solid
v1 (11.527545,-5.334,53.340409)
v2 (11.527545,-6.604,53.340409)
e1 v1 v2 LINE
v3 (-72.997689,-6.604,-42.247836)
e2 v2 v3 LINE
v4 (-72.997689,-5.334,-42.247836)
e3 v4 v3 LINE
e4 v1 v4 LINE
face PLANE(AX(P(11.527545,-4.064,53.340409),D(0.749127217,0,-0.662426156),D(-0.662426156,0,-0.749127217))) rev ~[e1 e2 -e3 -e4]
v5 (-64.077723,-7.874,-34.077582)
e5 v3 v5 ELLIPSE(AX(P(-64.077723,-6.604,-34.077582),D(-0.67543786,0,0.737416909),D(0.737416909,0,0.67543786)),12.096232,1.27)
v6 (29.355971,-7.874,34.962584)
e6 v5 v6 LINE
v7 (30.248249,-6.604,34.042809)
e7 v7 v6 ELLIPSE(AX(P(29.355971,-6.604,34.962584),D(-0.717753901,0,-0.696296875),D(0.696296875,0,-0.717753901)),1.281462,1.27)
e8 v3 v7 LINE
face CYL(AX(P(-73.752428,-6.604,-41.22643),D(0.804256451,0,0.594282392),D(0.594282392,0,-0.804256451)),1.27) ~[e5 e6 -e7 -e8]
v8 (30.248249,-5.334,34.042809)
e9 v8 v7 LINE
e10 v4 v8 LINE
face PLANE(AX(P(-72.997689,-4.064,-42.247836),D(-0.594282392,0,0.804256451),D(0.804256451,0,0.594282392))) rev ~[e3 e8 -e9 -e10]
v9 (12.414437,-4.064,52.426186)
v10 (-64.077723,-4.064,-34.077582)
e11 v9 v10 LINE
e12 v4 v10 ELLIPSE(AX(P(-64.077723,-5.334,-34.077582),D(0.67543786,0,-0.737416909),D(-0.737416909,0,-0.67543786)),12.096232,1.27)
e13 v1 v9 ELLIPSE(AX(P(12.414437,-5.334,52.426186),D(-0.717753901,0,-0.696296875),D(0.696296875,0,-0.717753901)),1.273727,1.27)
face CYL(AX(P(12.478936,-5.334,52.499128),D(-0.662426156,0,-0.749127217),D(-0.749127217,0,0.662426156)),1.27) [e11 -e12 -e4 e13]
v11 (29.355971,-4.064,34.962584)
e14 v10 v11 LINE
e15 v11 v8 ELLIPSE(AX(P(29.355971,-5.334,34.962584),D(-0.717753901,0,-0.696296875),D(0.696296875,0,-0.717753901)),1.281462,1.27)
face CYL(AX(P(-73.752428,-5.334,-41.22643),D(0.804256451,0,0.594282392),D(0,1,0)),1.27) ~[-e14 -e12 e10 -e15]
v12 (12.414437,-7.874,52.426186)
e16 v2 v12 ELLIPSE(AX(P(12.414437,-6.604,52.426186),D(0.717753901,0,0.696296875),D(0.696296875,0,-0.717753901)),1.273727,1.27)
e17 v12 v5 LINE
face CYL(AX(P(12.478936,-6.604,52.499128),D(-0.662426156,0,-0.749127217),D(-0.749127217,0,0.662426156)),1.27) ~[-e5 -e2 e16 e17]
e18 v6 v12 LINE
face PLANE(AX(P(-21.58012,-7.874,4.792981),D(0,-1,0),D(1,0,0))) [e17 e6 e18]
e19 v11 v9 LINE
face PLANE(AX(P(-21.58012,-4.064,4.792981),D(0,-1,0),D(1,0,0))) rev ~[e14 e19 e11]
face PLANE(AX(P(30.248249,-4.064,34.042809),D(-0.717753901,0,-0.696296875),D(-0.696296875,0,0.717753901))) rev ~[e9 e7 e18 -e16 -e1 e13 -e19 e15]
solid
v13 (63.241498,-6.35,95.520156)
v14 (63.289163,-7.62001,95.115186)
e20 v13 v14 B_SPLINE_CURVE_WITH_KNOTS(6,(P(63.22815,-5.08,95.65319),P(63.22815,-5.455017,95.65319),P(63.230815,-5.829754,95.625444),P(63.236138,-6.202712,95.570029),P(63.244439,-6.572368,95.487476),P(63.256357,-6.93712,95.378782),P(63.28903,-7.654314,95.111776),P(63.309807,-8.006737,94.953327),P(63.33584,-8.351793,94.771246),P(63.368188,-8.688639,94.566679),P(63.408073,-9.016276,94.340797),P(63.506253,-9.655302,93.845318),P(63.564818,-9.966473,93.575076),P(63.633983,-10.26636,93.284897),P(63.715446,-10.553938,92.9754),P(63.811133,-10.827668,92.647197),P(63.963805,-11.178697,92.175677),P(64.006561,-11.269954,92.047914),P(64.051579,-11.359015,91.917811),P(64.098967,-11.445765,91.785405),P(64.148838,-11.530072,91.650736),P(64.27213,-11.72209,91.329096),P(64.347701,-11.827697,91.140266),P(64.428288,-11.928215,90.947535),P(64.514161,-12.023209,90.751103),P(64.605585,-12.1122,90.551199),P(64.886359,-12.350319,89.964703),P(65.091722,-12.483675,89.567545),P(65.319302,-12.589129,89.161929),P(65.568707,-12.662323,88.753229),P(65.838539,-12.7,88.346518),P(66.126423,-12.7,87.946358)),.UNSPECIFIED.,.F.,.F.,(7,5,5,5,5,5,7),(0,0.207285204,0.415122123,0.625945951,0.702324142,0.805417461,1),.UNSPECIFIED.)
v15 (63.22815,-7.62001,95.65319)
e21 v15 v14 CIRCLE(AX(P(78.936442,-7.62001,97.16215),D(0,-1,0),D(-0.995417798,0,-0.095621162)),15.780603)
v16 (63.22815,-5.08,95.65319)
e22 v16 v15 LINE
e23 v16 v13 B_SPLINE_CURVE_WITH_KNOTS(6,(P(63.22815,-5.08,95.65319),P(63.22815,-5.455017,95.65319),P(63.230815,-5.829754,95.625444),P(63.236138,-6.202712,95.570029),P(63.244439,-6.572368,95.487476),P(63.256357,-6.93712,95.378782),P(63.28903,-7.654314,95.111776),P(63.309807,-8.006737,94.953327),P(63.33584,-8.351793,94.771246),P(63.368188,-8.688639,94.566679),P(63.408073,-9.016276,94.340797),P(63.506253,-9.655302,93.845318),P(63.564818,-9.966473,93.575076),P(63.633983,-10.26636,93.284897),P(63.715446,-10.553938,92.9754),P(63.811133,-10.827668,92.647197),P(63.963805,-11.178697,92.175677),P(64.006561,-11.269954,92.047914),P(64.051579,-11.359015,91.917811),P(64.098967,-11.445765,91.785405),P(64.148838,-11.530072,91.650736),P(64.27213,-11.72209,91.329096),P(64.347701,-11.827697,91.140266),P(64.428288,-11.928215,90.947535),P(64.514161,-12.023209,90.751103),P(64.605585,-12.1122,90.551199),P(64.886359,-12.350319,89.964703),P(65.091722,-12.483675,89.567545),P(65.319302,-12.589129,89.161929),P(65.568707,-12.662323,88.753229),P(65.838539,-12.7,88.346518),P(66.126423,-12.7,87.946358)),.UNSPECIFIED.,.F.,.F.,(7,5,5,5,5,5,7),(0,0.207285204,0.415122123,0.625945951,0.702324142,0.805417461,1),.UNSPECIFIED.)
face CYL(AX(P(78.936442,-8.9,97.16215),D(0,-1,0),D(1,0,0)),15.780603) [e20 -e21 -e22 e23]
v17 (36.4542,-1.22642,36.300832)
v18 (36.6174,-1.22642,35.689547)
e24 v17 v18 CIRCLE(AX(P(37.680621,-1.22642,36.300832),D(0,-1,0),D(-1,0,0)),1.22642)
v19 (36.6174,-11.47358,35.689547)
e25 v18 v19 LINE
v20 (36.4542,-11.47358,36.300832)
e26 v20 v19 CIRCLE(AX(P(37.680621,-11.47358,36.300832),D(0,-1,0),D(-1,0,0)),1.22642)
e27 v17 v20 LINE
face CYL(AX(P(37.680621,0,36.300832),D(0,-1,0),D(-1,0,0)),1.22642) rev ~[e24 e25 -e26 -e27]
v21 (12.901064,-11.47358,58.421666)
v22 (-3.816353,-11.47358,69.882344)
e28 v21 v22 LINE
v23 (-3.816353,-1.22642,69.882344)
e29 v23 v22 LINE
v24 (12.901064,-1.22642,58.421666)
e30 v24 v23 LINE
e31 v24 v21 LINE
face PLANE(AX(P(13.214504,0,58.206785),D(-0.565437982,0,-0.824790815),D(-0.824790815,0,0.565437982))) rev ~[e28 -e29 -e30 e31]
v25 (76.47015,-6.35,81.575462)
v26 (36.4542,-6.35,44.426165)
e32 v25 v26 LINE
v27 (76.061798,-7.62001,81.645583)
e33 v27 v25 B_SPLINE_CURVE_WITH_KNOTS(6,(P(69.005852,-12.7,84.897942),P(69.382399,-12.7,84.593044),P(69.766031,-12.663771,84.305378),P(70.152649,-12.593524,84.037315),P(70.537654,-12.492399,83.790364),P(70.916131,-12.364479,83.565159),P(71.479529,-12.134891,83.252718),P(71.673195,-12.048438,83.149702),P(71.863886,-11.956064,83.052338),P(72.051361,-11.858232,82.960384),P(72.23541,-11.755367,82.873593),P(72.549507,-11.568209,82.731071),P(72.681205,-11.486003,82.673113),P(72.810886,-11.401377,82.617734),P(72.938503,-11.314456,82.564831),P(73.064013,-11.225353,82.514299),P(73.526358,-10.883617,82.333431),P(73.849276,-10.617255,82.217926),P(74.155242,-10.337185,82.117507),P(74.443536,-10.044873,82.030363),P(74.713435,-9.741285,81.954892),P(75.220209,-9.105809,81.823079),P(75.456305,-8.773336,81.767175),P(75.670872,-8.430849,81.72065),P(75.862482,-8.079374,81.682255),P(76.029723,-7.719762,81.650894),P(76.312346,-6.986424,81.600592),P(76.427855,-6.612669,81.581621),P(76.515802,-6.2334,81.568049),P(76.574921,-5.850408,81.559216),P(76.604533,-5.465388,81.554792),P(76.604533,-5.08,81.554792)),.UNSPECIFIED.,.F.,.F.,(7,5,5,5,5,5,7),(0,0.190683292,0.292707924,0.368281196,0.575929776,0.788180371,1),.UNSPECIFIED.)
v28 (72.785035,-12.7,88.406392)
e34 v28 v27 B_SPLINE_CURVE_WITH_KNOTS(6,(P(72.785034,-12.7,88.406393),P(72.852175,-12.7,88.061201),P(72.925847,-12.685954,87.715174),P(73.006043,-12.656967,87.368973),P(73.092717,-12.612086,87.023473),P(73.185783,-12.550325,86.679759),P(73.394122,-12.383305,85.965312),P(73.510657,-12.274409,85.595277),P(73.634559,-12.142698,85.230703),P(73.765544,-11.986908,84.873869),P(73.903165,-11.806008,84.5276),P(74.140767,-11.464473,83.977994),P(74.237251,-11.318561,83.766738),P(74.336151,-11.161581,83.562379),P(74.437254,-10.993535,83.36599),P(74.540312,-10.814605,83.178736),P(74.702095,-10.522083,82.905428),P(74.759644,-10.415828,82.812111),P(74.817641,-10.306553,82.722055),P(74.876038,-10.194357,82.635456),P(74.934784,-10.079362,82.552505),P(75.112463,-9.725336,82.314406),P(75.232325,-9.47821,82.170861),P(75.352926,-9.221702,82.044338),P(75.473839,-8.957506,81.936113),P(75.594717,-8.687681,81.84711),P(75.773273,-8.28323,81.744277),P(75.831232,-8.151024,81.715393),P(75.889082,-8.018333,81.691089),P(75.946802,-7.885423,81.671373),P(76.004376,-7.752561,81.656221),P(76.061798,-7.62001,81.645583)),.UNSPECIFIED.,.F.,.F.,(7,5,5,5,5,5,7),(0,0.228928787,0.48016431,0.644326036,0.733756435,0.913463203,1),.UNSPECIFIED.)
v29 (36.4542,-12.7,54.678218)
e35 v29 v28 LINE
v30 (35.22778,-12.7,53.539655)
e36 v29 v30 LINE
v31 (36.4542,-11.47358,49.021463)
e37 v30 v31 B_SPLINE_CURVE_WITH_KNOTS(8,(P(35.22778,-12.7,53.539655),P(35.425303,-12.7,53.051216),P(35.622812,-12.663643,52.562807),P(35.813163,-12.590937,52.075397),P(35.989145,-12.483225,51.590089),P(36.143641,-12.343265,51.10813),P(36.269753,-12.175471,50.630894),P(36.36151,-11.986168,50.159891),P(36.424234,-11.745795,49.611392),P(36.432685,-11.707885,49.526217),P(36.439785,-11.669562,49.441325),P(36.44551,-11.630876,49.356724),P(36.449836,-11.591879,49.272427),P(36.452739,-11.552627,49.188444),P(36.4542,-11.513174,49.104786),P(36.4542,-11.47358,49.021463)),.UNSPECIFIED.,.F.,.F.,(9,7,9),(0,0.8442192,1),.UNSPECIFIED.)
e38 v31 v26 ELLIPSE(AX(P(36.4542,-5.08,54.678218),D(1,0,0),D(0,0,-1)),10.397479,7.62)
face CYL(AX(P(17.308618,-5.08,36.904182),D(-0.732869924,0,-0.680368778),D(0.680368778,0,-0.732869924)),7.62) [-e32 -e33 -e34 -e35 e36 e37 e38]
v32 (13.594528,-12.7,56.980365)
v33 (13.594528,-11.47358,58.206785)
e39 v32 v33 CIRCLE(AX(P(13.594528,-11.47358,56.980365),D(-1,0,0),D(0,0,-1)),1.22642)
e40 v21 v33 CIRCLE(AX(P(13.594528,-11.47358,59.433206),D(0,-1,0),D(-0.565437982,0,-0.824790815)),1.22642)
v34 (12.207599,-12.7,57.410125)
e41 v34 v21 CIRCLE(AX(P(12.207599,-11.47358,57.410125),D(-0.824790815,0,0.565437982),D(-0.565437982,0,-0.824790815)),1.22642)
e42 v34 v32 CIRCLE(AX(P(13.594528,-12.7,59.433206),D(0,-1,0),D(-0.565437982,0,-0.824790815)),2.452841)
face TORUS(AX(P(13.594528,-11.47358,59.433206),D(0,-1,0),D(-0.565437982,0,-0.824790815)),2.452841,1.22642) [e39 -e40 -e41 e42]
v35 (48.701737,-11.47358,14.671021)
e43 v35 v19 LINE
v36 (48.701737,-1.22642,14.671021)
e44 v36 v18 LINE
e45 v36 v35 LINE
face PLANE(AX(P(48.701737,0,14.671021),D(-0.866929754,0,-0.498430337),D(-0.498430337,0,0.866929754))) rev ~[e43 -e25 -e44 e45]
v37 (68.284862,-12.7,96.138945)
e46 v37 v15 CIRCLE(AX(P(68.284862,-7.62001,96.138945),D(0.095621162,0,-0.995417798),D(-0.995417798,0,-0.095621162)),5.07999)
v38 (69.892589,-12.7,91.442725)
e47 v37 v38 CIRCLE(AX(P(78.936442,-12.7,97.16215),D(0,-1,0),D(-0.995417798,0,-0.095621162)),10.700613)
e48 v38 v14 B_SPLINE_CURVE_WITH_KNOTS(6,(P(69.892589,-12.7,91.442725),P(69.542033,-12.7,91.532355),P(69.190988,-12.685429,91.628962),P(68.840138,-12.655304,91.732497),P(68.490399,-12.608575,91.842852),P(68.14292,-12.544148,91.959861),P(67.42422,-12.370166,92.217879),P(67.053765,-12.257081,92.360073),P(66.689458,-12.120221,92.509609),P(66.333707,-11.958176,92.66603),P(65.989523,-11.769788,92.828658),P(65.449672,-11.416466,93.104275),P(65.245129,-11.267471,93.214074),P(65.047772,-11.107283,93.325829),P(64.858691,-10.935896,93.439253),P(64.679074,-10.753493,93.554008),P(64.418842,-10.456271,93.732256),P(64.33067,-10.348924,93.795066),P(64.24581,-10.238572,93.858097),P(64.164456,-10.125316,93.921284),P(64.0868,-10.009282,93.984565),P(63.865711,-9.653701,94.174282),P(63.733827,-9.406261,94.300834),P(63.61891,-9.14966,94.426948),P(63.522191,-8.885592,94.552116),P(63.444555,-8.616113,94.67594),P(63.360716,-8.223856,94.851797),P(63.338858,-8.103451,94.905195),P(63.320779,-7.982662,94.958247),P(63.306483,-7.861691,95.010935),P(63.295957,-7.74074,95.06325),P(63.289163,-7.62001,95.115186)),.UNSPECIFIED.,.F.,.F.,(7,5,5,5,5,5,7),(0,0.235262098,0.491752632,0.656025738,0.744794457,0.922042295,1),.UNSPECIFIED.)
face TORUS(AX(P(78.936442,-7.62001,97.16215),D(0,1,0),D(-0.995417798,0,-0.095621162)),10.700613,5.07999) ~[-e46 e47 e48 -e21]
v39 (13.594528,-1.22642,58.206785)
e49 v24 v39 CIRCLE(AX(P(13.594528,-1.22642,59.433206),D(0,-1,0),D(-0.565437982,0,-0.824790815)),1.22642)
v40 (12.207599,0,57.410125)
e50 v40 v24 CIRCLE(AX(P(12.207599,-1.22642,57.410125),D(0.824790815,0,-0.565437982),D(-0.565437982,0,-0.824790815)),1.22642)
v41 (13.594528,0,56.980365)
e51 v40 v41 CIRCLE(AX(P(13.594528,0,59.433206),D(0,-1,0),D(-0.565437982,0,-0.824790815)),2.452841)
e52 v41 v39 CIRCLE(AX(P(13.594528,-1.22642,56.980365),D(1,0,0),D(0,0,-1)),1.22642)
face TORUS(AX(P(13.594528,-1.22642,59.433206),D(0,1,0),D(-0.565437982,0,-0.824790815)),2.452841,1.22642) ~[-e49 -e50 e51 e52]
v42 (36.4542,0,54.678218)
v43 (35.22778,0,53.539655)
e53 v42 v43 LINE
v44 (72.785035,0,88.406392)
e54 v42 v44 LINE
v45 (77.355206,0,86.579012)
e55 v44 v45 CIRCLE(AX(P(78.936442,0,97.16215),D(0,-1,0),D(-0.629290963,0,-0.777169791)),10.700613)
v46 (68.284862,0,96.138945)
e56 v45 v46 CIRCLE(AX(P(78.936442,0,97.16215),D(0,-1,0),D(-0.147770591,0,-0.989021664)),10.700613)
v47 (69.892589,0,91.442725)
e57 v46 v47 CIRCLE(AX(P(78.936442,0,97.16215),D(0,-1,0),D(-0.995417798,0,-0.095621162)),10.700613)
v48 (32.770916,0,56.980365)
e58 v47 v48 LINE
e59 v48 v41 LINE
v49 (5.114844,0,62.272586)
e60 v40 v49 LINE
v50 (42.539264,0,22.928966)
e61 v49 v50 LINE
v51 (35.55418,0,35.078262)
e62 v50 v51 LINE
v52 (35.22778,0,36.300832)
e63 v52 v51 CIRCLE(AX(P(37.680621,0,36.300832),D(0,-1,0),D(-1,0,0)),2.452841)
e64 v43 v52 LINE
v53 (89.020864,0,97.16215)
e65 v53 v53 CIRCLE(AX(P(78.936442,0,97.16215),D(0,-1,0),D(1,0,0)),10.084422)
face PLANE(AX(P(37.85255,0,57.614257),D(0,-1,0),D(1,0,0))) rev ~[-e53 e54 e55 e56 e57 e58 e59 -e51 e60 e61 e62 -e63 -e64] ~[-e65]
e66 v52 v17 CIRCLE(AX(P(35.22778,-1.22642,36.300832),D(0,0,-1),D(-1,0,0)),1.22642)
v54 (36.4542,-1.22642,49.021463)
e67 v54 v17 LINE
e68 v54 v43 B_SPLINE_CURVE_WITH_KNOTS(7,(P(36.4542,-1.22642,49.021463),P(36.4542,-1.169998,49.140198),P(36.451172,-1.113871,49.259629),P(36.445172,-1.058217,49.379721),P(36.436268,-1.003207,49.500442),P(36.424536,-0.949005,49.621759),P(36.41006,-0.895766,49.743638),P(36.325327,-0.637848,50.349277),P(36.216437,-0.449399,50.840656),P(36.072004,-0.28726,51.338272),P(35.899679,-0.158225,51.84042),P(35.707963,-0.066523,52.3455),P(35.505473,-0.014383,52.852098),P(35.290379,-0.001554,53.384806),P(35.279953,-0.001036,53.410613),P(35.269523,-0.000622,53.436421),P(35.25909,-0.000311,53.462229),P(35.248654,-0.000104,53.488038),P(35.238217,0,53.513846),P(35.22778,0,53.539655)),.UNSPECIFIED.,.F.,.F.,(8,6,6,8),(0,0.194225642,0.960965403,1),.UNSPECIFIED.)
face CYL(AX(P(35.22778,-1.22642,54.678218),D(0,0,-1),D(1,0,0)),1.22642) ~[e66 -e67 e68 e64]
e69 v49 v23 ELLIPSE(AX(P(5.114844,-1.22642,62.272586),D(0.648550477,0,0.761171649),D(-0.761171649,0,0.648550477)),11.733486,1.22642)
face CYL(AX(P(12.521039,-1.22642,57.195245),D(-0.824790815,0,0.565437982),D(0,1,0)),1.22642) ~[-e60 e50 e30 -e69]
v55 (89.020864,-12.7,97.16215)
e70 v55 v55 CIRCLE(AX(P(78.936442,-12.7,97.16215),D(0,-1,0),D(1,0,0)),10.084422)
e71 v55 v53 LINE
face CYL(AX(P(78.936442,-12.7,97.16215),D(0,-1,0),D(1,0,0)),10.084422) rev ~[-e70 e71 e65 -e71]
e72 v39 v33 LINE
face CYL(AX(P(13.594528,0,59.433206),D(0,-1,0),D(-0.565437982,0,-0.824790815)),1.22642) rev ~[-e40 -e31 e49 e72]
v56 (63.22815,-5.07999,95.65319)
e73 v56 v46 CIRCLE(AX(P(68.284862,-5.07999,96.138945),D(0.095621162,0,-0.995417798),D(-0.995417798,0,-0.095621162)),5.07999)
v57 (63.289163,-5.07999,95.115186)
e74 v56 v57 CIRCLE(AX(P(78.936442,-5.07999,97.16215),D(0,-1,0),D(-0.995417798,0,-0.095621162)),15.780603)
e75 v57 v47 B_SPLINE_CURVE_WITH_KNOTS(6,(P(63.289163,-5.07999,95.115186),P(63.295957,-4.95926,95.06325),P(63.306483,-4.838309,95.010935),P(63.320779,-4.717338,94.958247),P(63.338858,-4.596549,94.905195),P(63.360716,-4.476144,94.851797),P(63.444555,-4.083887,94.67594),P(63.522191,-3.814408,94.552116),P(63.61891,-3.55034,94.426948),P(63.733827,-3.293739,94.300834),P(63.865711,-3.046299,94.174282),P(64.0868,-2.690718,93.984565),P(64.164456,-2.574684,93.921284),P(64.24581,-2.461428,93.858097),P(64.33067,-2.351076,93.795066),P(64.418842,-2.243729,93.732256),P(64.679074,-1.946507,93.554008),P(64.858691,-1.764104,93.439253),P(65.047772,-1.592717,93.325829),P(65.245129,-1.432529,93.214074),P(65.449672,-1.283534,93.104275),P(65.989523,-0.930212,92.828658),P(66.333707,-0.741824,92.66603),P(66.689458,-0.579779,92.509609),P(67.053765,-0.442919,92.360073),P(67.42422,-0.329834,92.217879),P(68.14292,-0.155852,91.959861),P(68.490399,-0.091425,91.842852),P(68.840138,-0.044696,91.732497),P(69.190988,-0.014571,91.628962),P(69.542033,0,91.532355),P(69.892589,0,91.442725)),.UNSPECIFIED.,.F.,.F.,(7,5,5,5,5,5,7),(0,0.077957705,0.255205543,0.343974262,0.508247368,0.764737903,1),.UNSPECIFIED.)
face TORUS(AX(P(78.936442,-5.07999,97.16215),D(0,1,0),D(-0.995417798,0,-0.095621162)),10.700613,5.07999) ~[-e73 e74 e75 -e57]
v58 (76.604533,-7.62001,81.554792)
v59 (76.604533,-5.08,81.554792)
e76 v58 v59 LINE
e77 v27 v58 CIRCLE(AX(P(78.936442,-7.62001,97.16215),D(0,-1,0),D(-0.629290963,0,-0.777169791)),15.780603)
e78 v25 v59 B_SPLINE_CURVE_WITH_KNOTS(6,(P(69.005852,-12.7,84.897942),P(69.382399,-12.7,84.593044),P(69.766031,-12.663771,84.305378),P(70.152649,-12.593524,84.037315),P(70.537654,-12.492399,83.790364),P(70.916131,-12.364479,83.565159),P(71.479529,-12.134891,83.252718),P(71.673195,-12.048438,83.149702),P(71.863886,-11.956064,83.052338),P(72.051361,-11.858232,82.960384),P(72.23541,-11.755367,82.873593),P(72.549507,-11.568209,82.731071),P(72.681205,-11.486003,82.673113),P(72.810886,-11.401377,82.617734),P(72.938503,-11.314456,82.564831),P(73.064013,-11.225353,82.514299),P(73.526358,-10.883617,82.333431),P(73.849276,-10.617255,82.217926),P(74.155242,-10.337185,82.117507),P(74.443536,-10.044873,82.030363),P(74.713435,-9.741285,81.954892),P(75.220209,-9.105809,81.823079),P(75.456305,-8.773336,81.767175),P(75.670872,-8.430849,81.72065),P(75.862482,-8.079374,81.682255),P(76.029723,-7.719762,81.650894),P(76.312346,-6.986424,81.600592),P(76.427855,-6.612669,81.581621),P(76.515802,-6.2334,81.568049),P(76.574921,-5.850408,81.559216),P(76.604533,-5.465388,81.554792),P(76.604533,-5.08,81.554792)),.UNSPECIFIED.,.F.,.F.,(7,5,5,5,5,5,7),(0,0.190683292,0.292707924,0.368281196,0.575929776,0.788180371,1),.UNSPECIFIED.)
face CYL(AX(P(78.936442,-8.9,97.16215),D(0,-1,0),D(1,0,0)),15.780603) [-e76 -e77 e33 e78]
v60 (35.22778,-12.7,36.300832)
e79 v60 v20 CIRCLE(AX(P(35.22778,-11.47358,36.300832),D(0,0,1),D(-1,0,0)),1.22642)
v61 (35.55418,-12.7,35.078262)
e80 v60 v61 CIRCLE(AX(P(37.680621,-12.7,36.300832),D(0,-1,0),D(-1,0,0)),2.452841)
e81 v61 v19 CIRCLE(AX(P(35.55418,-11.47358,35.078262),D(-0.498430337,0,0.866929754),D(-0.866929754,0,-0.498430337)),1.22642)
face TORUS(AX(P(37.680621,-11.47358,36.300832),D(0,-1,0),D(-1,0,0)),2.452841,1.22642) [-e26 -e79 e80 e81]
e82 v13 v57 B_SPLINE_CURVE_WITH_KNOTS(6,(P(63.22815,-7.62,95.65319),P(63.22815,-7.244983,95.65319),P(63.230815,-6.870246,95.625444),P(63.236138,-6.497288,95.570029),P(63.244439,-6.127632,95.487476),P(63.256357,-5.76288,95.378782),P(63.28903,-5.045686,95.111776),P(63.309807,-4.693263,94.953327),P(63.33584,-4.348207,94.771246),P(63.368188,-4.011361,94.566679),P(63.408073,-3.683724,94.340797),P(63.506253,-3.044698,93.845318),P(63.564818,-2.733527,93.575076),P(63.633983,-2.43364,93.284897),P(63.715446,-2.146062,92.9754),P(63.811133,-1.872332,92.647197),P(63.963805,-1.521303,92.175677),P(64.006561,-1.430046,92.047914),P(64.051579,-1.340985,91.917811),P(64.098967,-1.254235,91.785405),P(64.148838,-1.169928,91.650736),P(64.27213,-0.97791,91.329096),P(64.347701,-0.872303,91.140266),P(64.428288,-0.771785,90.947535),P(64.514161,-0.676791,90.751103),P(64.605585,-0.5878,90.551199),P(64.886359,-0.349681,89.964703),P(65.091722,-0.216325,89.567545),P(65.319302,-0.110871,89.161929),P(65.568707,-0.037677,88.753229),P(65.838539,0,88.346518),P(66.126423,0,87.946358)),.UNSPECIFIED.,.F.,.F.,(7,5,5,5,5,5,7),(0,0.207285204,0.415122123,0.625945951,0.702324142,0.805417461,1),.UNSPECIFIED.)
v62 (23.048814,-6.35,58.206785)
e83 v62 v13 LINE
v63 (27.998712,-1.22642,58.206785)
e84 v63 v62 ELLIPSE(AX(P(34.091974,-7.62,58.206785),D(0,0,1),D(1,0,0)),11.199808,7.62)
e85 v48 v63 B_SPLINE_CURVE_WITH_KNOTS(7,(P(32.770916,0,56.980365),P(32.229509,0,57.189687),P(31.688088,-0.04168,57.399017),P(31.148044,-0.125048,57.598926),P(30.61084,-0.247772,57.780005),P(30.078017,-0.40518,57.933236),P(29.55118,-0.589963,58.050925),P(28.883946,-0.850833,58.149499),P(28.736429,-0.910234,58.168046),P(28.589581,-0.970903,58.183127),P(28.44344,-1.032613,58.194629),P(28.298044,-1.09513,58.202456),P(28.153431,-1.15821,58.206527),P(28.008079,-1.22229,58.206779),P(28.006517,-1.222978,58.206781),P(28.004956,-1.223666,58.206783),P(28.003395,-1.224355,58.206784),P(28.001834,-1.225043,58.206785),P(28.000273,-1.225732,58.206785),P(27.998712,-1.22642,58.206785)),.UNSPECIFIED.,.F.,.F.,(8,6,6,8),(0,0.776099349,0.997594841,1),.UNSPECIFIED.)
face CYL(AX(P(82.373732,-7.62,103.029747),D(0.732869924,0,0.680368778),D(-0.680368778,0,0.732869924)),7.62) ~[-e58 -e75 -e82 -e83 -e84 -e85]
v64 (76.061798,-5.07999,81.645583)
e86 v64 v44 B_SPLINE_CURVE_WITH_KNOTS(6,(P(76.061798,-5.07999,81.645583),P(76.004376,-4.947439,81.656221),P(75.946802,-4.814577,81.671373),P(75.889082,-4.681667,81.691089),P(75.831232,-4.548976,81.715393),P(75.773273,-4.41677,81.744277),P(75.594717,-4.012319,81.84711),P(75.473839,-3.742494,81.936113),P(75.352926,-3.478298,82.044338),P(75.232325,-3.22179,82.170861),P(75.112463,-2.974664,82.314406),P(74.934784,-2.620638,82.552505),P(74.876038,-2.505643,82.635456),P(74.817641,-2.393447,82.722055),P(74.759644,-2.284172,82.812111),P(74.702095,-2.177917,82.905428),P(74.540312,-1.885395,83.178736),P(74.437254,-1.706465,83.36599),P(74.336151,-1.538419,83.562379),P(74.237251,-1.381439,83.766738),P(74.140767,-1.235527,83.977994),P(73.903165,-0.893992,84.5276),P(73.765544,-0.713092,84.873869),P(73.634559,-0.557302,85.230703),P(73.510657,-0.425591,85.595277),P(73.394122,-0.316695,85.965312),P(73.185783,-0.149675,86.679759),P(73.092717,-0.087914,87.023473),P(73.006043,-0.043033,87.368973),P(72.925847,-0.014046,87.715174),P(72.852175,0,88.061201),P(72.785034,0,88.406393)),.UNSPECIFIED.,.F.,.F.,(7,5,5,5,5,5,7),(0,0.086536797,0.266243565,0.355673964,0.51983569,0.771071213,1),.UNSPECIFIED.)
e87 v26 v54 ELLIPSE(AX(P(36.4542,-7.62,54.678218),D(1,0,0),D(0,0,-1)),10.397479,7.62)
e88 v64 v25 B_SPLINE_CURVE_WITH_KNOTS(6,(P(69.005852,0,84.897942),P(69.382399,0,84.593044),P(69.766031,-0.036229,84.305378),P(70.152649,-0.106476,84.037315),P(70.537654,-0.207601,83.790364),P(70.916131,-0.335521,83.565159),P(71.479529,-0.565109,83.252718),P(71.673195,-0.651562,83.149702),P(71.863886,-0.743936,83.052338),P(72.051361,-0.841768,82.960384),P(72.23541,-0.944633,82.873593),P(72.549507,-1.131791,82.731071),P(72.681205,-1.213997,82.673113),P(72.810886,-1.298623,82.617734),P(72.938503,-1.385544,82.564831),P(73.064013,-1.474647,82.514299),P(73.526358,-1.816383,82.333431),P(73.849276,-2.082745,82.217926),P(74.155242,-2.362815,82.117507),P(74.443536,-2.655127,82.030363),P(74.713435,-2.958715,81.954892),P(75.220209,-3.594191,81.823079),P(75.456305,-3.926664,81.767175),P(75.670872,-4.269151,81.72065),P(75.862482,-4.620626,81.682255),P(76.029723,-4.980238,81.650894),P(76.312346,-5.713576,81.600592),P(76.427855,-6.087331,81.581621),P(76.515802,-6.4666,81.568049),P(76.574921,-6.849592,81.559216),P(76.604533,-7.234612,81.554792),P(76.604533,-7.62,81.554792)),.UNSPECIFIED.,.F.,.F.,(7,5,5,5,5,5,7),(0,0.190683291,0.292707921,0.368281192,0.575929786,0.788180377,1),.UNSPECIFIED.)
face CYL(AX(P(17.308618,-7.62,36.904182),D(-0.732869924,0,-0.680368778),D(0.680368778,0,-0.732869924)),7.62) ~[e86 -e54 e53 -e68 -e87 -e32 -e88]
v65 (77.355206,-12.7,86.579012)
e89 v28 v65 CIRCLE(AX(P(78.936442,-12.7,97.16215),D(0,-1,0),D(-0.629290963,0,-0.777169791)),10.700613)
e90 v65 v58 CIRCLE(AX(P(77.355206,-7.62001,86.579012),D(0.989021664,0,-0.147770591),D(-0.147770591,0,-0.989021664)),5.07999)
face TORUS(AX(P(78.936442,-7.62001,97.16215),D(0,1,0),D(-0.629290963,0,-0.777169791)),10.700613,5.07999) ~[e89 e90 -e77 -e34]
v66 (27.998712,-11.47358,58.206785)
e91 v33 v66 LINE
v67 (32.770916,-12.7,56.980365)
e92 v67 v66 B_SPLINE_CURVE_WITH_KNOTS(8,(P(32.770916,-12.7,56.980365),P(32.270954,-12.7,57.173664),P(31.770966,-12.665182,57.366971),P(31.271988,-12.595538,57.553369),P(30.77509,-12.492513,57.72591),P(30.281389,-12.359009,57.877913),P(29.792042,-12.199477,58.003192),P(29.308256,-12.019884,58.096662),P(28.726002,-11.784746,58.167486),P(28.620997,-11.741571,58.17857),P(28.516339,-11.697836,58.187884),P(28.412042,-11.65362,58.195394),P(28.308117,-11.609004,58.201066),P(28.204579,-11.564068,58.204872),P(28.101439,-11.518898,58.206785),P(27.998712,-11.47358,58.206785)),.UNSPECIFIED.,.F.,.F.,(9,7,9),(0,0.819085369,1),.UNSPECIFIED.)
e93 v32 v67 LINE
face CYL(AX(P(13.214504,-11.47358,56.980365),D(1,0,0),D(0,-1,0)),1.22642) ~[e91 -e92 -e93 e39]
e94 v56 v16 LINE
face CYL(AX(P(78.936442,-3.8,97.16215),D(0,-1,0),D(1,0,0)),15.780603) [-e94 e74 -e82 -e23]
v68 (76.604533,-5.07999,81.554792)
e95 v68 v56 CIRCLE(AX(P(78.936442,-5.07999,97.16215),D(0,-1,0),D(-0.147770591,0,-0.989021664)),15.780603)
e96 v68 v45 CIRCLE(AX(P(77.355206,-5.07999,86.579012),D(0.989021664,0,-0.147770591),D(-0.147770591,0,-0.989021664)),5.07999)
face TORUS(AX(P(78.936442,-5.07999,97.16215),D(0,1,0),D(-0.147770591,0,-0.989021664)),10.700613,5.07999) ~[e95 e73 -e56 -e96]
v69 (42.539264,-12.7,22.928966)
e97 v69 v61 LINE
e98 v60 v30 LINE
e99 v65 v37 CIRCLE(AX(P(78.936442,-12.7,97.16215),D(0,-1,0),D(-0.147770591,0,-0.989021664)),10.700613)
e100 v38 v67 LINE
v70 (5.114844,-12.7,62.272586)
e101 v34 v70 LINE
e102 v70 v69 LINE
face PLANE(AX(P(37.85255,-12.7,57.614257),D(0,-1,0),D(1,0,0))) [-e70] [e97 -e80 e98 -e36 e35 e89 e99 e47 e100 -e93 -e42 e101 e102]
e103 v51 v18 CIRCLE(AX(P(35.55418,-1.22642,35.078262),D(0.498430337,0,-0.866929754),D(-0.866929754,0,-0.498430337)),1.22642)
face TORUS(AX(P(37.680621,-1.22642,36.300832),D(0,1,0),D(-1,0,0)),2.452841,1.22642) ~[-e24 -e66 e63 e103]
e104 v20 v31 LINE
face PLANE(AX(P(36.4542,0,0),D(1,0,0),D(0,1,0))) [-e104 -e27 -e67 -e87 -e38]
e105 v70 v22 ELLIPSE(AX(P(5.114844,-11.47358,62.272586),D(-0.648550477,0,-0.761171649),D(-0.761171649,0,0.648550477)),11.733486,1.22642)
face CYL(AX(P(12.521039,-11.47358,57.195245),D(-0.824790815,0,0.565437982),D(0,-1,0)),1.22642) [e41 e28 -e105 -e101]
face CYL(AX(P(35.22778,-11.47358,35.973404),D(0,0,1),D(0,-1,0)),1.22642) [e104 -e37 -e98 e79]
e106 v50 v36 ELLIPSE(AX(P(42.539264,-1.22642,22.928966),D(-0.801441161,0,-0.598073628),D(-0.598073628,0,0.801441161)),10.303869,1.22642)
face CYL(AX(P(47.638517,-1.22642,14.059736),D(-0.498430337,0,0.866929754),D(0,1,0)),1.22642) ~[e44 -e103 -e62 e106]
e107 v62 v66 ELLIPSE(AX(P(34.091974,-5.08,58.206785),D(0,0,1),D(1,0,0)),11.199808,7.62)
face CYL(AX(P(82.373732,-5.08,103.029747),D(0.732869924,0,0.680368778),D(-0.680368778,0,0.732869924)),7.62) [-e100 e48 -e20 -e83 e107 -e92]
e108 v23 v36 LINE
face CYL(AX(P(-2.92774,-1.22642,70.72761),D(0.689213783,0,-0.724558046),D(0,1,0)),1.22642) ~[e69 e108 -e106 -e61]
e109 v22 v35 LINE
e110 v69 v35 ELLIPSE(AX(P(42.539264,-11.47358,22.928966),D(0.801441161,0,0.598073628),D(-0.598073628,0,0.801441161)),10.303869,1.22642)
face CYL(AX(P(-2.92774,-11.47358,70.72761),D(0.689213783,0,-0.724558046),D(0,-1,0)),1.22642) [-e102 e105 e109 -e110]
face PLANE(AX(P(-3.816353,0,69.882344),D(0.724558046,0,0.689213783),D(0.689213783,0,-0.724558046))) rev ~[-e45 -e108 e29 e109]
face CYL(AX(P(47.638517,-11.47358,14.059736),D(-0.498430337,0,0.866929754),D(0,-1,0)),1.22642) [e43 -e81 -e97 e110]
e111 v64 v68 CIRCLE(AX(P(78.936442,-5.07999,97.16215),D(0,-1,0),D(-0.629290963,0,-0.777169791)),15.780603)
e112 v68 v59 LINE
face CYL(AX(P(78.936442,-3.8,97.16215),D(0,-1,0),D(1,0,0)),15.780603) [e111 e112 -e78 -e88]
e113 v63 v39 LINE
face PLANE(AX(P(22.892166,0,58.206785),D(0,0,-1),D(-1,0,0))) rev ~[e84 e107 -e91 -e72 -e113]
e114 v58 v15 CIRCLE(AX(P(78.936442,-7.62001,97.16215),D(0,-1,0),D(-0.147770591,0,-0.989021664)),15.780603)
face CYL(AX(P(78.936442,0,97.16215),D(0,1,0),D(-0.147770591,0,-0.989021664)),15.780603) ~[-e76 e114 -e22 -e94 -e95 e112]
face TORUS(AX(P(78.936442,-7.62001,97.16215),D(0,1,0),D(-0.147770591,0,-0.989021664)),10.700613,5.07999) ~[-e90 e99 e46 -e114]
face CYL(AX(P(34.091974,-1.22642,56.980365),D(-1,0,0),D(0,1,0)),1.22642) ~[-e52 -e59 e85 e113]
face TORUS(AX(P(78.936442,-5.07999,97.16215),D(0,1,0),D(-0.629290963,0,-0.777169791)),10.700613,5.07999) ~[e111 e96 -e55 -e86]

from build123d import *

# Parameters (mm, degrees)
F1_DEPTH     = 12.7
F3_START     = 4.064
F3_DEPTH     = 3.81
F4_T4_DEPTH  = 93.1383939159
F4_S5_R      = 15.7806026061
F4_T6_DEPTH  = 52
F4_T11_DEPTH = 93.1383939159
F4_S12_R     = 15.7806026061
F4_T13_DEPTH = 52
F4_T18_DEPTH = 92.8850738108
F4_S20_R     = 15.7806026061
F4_T21_DEPTH = 52
F4_T25_DEPTH = 92.8850738108
F4_S27_R     = 15.7806026061
F4_T28_DEPTH = 52
F5_R         = 5.07999
F6_R         = 1.2264204897
F7_R         = 1.27
F8_R         = 1.27
F9_R         = 10.0844220232
F10_DEPTH    = 12.7


# Not quite as in the source:
# - a fillet or chamfer that OpenCascade refuses, or shapes differently, is made with other operations: its cross-section is extruded or revolved along the edge and cut away or added
# - a fillet or chamfer is up to 0.001 mm smaller than in the source, because OpenCascade refuses the exact size


with BuildPart() as f1:
    # F0 (on Front) → F1 (new body)
    with BuildSketch(Plane.XZ):
        with BuildLine():
            Line((13.2145041692, 58.2067854702), (-3.8163531803, 69.8823442173))
            Line((-3.8163531803, 69.8823442173), (48.701737076, 14.6710211411))
            Line((48.701737076, 14.6710211411), (36.4542003432, 35.9734042756))
            Line((36.4542003432, 35.9734042756), (36.4542003432, 44.2807382619))
            Line((36.4542003432, 44.2807382619), (76.6045332289, 81.554791994))
            ThreePointArc((76.6045332289, 81.554791994), (67.4885852958, 86.3005665919), (63.228149501, 95.6531902927))
            Line((63.228149501, 95.6531902927), (22.8921659291, 58.2067854702))
            Line((22.8921659291, 58.2067854702), (13.2145041692, 58.2067854702))
        make_face()
        with BuildLine():
            ThreePointArc((94.7170448112, 97.1621498466), (78.1810966455, 112.9246646109), (63.228149501, 95.6531902927))
            ThreePointArc((63.228149501, 95.6531902927), (67.4885852958, 86.3005665919), (76.6045332289, 81.554791994))
            ThreePointArc((76.6045332289, 81.554791994), (89.2376190734, 85.207520043), (94.7170448112, 97.1621498466))
        make_face()
    extrude(amount=F1_DEPTH)

    # F4: fillet of radius 7.62 on 4 edges, made by hand


with BuildPart() as f3:
    # F2 (on Front) → F3 (new body)
    with BuildSketch(Plane.XZ.offset(F3_START)):
        Polygon((11.5275448188, 53.340408951), (-72.9976892471, -42.2478355467), (30.2482489496, 34.0428091586), align=None)
    extrude(amount=F3_DEPTH)

    # F7
    f7_edges = [f3.edges().sort_by_distance(p)[0] for p in [
        (-21.37472, -7.874, -4.102513),
        (-30.735072, -7.874, 5.546287),
    ]]
    fillet(f7_edges, radius=F7_R)

    # F8
    f8_edges = [f3.edges().sort_by_distance(p)[0] for p in [
        (-30.735072, -4.064, 5.546287),
        (-21.37472, -4.064, -4.102513),
    ]]
    fillet(f8_edges, radius=F8_R)


with BuildPart() as f4_tool2:
    # F4_s3 → F4_t4 (new body)
    with BuildSketch(Plane(origin=(95.6156726243, 0, 88.7659818207), x_dir=(0, 1, 0), z_dir=(-0.7328699241, 0, -0.6803687782))):
        with BuildLine():
            ThreePointArc((-5.08, -27.0828874864), (-10.4681536726, -24.8510411591), (-12.7, -19.4628874864))
            Line((-12.7, -19.4628874864), (-12.7, -27.0828874864))
            Line((-12.7, -27.0828874864), (-5.08, -27.0828874864))
        make_face()
    extrude(amount=F4_T4_DEPTH)

    # F4_s5 → F4_t6 (cut, symmetric)
    with BuildSketch(Plane.XZ.offset(8.9)):
        with Locations((78.936442205, 97.1621498466)):
            Circle(F4_S5_R)
    extrude(amount=F4_T6_DEPTH, both=True, mode=Mode.SUBTRACT)

    split(bisect_by=Plane.XY.offset(58.2067854702), keep=Keep.TOP)


with BuildPart() as f1_1:
    add(f1.part)

    # F4_t1: cut F4_tool2
    add(f4_tool2.part, mode=Mode.SUBTRACT)


with BuildPart() as f4_tool9:
    # F4_s10 → F4_t11 (new body)
    with BuildSketch(Plane(origin=(95.6156726243, 0, 88.7659818207), x_dir=(0, 1, 0), z_dir=(-0.7328699241, 0, -0.6803687782))):
        with BuildLine():
            ThreePointArc((-7.62, -27.0828874864), (-2.2318463274, -24.8510411591), (0, -19.4628874864))
            Line((0, -19.4628874864), (0, -27.0828874864))
            Line((0, -27.0828874864), (-7.62, -27.0828874864))
        make_face()
    extrude(amount=F4_T11_DEPTH)

    # F4_s12 → F4_t13 (cut, symmetric)
    with BuildSketch(Plane.XZ.offset(3.8)):
        with Locations((78.936442205, 97.1621498466)):
            Circle(F4_S12_R)
    extrude(amount=F4_T13_DEPTH, both=True, mode=Mode.SUBTRACT)

    split(bisect_by=Plane.XY.offset(58.2067854702), keep=Keep.TOP)


with BuildPart() as f1_2:
    add(f1_1.part)

    # F4_t8: cut F4_tool9
    add(f4_tool9.part, mode=Mode.SUBTRACT)


with BuildPart() as f4_tool16:
    # F4_s17 → F4_t18 (new body)
    with BuildSketch(Plane(origin=(27.6976599878, 0, 25.7134621917), x_dir=(0, 1, 0), z_dir=(0.7328699241, 0, 0.6803687782))):
        with BuildLine():
            ThreePointArc((-5.08, 7.6497215416), (-10.4681536726, 9.8815678689), (-12.7, 15.2697215416))
            Line((-12.7, 15.2697215416), (-12.7, 7.6497215416))
            Line((-12.7, 7.6497215416), (-5.08, 7.6497215416))
        make_face()
    extrude(amount=F4_T18_DEPTH)

    split(bisect_by=Plane.YZ.offset(36.4542003432), keep=Keep.TOP)

    # F4_s20 → F4_t21 (cut, symmetric)
    with BuildSketch(Plane.XZ.offset(8.9)):
        with Locations((78.936442205, 97.1621498466)):
            Circle(F4_S20_R)
    extrude(amount=F4_T21_DEPTH, both=True, mode=Mode.SUBTRACT)


with BuildPart() as f1_3:
    add(f1_2.part)

    # F4_t15: cut F4_tool16
    add(f4_tool16.part, mode=Mode.SUBTRACT)


with BuildPart() as f4_tool23:
    # F4_s24 → F4_t25 (new body)
    with BuildSketch(Plane(origin=(27.6976599878, 0, 25.7134621917), x_dir=(0, 1, 0), z_dir=(0.7328699241, 0, 0.6803687782))):
        with BuildLine():
            ThreePointArc((-7.62, 7.6497215416), (-2.2318463274, 9.8815678689), (0, 15.2697215416))
            Line((0, 15.2697215416), (0, 7.6497215416))
            Line((0, 7.6497215416), (-7.62, 7.6497215416))
        make_face()
    extrude(amount=F4_T25_DEPTH)

    split(bisect_by=Plane.YZ.offset(36.4542003432), keep=Keep.TOP)

    # F4_s27 → F4_t28 (cut, symmetric)
    with BuildSketch(Plane.XZ.offset(3.8)):
        with Locations((78.936442205, 97.1621498466)):
            Circle(F4_S27_R)
    extrude(amount=F4_T28_DEPTH, both=True, mode=Mode.SUBTRACT)


with BuildPart() as f1_4:
    add(f1_3.part)

    # F4_t22: cut F4_tool23
    add(f4_tool23.part, mode=Mode.SUBTRACT)

    # F5 (radius 5.08 in the source; OpenCascade refuses exactly that, so slightly less here)
    f5_edges = [f1_4.edges().sort_by_distance(p)[0] for p in [
        (87.15426, 0, 110.634154),
        (87.15426, -12.7, 110.634154),
    ]]
    fillet(f5_edges, radius=F5_R)

    # F6
    f6_edges = [f1_4.edges().sort_by_distance(p)[0] for p in [
        (4.699075, 0, 64.044565),
        (23.653239, 0, 58.206785),
        (4.699075, -12.7, 64.044565),
        (23.653239, -12.7, 58.206785),
        (36.4542, 0, 45.325811),
        (42.577969, 0, 25.322213),
        (36.4542, -12.7, 45.325811),
        (42.577969, -12.7, 25.322213),
        (36.4542, -6.35, 35.973404),
        (13.214504, -6.35, 58.206785),
        (22.442692, 0, 42.276683),
        (22.442692, -12.7, 42.276683),
    ]]
    fillet(f6_edges, radius=F6_R)

    # F9 (on face) → F10 (cut)
    with BuildSketch(Plane.XZ.offset(12.7)):
        with Locations((78.936442205, 97.1621498466)):
            Circle(F9_R)
    extrude(amount=-F10_DEPTH, mode=Mode.SUBTRACT)


solid = Compound([f3.part, f1_4.part])
